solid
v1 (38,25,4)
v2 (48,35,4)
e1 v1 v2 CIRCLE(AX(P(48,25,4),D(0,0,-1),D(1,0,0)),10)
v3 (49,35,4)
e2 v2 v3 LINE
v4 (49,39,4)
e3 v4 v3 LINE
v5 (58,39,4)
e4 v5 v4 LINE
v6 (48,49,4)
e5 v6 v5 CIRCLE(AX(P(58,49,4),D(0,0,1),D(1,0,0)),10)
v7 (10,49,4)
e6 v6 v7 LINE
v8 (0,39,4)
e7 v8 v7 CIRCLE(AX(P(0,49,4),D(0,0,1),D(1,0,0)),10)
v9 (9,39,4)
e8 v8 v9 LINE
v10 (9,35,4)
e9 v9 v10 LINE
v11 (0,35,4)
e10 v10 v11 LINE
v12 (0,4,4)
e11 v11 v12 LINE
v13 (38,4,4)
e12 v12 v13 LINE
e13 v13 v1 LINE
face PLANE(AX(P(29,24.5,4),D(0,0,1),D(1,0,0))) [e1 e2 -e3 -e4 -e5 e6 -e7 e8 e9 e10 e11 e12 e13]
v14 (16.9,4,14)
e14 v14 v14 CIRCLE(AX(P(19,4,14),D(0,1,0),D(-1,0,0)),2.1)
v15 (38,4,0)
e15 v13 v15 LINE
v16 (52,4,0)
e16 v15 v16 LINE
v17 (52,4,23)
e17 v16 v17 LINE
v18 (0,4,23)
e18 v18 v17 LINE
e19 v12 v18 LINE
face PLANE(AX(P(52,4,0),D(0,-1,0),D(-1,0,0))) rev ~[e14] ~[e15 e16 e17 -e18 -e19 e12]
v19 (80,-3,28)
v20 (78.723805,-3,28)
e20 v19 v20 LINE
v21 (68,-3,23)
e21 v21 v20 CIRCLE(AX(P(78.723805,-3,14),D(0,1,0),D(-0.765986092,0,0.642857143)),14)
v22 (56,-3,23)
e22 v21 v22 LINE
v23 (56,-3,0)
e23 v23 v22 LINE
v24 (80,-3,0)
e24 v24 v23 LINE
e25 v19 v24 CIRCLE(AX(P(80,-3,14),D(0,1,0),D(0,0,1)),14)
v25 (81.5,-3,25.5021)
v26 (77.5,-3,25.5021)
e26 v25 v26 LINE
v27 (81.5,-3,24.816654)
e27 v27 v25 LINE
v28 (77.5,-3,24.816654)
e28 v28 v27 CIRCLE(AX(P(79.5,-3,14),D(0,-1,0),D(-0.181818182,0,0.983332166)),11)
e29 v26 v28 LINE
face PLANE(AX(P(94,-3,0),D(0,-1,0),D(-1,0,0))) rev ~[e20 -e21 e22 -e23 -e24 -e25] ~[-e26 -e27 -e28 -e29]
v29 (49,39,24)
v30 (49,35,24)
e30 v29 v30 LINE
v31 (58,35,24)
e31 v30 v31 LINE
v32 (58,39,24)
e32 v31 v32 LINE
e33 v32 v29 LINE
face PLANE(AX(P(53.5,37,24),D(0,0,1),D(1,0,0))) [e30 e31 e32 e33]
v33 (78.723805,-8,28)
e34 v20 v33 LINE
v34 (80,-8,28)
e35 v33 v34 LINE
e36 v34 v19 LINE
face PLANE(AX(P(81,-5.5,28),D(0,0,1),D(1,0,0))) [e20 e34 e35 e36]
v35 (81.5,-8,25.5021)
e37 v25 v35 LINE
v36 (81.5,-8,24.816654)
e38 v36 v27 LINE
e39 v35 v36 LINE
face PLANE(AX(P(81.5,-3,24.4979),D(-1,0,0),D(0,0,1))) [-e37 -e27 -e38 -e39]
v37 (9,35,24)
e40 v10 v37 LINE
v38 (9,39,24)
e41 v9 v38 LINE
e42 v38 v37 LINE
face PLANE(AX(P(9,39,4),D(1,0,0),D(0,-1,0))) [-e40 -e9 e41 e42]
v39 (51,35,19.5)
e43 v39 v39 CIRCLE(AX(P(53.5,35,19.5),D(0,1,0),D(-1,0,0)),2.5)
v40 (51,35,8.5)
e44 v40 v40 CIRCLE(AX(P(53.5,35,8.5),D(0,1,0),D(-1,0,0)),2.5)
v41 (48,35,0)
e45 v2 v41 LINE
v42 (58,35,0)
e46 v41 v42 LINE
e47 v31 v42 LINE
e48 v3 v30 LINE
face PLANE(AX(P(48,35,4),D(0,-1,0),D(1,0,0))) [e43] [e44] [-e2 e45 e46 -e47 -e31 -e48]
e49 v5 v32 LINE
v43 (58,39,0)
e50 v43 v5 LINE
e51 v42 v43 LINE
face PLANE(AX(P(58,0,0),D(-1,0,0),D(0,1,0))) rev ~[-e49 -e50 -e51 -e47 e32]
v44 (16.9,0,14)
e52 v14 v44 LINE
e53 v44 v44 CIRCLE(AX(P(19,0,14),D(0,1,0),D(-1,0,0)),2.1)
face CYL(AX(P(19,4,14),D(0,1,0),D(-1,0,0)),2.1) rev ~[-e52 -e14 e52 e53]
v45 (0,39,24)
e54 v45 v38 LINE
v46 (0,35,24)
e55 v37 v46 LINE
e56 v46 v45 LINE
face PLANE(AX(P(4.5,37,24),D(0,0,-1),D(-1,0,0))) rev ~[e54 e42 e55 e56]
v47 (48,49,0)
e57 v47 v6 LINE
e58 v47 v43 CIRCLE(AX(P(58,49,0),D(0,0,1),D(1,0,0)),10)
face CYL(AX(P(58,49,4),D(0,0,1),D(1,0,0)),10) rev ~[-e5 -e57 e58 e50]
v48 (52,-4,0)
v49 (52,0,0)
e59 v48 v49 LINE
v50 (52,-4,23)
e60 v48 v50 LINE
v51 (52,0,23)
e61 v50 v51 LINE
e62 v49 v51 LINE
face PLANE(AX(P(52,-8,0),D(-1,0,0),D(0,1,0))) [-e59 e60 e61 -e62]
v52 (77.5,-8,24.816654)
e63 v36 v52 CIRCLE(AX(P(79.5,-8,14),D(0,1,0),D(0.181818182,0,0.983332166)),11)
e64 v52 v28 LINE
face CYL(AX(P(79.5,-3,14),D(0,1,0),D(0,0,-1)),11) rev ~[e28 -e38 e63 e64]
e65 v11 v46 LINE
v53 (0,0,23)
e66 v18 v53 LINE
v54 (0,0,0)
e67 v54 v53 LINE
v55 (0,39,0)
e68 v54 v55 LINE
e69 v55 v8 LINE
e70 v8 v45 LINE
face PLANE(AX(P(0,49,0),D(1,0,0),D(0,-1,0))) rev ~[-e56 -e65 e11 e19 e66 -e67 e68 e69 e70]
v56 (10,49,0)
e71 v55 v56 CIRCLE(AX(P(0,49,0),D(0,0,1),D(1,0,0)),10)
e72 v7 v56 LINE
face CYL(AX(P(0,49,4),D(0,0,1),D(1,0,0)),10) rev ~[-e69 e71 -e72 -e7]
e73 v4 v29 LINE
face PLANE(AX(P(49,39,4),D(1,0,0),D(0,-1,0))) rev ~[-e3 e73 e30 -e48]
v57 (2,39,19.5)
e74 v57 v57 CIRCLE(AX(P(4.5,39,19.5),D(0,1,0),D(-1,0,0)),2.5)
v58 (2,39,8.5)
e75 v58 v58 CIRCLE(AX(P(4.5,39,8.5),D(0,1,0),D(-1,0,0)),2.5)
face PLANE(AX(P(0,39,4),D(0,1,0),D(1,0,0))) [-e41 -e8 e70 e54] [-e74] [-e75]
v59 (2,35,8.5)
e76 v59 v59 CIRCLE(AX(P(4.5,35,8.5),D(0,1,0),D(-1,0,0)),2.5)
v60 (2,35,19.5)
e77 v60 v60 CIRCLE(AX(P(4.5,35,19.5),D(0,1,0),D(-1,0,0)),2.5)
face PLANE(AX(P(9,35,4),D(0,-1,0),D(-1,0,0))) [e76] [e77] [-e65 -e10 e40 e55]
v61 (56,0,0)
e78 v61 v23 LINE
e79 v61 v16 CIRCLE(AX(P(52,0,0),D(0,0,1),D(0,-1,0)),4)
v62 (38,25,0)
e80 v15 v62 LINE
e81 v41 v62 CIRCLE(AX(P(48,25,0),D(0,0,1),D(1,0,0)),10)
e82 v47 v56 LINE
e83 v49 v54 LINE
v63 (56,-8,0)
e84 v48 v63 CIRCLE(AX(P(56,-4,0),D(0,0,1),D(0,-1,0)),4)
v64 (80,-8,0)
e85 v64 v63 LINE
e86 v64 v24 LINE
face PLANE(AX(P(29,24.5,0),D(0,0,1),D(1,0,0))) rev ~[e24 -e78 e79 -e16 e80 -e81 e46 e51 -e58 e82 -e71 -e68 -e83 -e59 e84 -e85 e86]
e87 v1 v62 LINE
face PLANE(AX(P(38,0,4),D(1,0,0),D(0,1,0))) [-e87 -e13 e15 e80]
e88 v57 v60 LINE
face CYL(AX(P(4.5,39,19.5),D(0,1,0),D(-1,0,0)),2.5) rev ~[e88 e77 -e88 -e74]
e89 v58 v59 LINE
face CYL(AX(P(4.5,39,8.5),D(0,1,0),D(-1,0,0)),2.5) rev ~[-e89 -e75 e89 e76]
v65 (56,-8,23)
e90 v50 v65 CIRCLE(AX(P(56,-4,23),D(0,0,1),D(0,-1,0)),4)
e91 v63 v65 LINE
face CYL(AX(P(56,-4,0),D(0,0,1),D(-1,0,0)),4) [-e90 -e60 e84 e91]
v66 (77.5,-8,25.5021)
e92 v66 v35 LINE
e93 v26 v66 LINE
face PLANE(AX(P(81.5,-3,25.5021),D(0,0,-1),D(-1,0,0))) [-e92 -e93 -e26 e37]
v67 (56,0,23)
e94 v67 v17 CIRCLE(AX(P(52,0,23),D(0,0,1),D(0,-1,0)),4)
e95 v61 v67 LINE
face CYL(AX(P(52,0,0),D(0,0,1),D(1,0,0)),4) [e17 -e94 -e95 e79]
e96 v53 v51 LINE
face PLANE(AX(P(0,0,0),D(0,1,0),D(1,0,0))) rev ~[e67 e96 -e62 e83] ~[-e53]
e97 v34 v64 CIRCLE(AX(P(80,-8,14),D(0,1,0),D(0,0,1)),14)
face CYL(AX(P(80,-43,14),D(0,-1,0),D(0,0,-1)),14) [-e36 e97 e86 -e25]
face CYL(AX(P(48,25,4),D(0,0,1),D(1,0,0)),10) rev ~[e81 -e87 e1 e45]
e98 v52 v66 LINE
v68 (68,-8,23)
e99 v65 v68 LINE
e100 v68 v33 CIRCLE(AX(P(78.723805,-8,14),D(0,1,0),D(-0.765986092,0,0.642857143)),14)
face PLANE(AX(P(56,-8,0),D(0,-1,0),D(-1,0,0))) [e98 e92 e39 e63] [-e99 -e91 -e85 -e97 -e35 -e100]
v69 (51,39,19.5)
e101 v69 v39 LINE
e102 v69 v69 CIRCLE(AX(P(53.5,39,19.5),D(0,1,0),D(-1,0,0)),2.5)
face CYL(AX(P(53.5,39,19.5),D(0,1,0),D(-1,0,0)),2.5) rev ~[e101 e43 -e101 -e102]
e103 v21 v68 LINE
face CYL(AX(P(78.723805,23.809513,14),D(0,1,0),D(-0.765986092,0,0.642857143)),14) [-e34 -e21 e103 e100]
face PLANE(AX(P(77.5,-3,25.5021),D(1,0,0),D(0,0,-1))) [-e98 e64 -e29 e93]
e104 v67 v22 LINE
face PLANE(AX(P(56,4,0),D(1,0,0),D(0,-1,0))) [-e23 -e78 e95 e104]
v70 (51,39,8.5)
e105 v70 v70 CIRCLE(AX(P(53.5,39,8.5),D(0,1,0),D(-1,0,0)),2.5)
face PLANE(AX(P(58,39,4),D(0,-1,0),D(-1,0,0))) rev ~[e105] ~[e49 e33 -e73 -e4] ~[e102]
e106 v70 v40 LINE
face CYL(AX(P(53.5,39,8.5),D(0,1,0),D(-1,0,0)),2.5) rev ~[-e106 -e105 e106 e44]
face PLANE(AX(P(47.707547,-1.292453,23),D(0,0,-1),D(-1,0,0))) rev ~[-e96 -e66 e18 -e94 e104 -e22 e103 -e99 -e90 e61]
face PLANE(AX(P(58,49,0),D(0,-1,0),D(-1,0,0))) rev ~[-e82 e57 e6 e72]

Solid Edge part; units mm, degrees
sketch "Sketch1" plane through (0, 0, 0) normal (0, 0, 1) x (1, 0, 0)
  line L0 (58, 49) -> (0, 49)
  line L1 (0, 49) -> (0, 0)
  line L2 (0, 0) -> (58, 0)
  line L3 (58, 0) -> (58, 49)
extrude "Protrusion1" add sketch "Sketch1" along normal blind 4
sketch "Sketch2" plane through (29, 24.5, 4) normal (0, 0, 1) x (1, 0, 0)
  circle A0 centre (-29, 24.5) radius 10
  circle A1 centre (29, 24.5) radius 10
  dimension "D1" = 20
extrude "Cutout1" cut sketch "Sketch2" against normal through all
sketch "Sketch3" plane through (29, 24.5, 4) normal (0, 0, 1) x (1, 0, 0)
  line L0 (-20, 10.5) -> (-29, 10.5)
  line L1 (-29, 10.5) -> (-29, 14.5)
  line L2 (-29, 14.5) -> (-20, 14.5)
  line L3 (-20, 14.5) -> (-20, 10.5)
  line L4 (20, 10.5) -> (29, 10.5)
  line L5 (29, 10.5) -> (29, 14.5)
  line L6 (29, 14.5) -> (20, 14.5)
  line L7 (20, 14.5) -> (20, 10.5)
  dimension "D1" = 4
  dimension "D2" = 9
extrude "ExtrudedProtrusion_2" add sketch "Sketch3" along normal blind 20
sketch "Sketch4" plane through (29, 24.5, 4) normal (0, 0, 1) x (1, 0, 0)
  line L0 (19, 10.5) -> (29, 10.5)
  line L1 (29, 10.5) -> (29, 0.5)
  line L2 (29, 0.5) -> (29, -24.5)
  line L3 (29, -24.5) -> (9, -24.5)
  line L4 (9, -24.5) -> (9, 0.5)
  arc A0 (9, 0.5) -> (19, 10.5) centre (19, 0.5) cw
extrude "Cutout2" cut sketch "Sketch4" against normal through all
sketch "Sketch5" plane through (0, 0, 0) normal (0, 0, 1) x (1, 0, 0)
  line L0 (52, -8) -> (52, 0)
  line L1 (0, 0) -> (52, 0)
  line L2 (0, 4) -> (0, 0)
  line L3 (52, 4) -> (0, 4)
  line L4 (52, 4) -> (56, 4)
  line L5 (56, 4) -> (56, -3)
  line L6 (94, -3) -> (56, -3)
  line L7 (94, -8) -> (94, -3)
  line L8 (56, -8) -> (94, -8)
  line L9 (56, -8) -> (52, -8)
extrude "ExtrudedProtrusion_3" add sketch "Sketch5" along normal blind 23
sketch "Sketch6" plane through (4.5, 39, 13.5) normal (0, 1, 0) x (-1, 0, 0)
  circle A0 centre (-49, 6) radius 2.5
  circle A1 centre (-49, -5) radius 2.5
  circle A2 centre (0, 6) radius 2.5
  circle A3 centre (0, -5) radius 2.5
  dimension "D1" = 5
  dimension "D2" = 4.5
  dimension "D3" = 15.5
extrude "Cutout3" cut sketch "Sketch6" against normal up to next
sketch "Sketch7" plane through (28, 4, 11.5) normal (0, 1, 0) x (-1, 0, 0)
  circle A0 centre (9, 2.5) radius 2.1
extrude "Cutout4" cut sketch "Sketch7" against normal up to next
fillet "Round_1" radius 4 2 edges at (56, 4, 11.5) (52, -8, 11.5)
sketch "Sketch8" plane through (47, -2, 23) normal (0, 0, 1) x (-1, 0, 0)
  line L0 (-47, 1) -> (-21, 1)
  line L1 (-21, 1) -> (-21, 6)
  line L2 (-21, 6) -> (-47, 6)
  line L3 (-47, 6) -> (-47, 1)
extrude "ExtrudedProtrusion_4" add sketch "Sketch8" along normal blind 5
fillet "Round_2" radius 14 3 edges at (94, -5.5, 28) (94, -5.5, 0) (68, -5.5, 28)
sketch "Sketch9" plane through (72, -3, 11.5) normal (0, 1, 0) x (0, 0, -1)
  circle A0 centre (-2.5, -7.5) radius 11
extrude "Cutout5" cut sketch "Sketch9" against normal up to next
sketch "Sketch10" plane through (75, -3, 14) normal (0, 1, 0) x (-1, 0, 0)
  line L0 (-2.5, 10.4979) -> (-6.5, 10.4979)
  line L1 (-6.5, 10.4979) -> (-6.5, 11.5021)
  line L2 (-6.5, 11.5021) -> (-2.5, 11.5021)
  line L3 (-2.5, 11.5021) -> (-2.5, 10.4979)
extrude "Cutout6" cut sketch "Sketch10" against normal through all
